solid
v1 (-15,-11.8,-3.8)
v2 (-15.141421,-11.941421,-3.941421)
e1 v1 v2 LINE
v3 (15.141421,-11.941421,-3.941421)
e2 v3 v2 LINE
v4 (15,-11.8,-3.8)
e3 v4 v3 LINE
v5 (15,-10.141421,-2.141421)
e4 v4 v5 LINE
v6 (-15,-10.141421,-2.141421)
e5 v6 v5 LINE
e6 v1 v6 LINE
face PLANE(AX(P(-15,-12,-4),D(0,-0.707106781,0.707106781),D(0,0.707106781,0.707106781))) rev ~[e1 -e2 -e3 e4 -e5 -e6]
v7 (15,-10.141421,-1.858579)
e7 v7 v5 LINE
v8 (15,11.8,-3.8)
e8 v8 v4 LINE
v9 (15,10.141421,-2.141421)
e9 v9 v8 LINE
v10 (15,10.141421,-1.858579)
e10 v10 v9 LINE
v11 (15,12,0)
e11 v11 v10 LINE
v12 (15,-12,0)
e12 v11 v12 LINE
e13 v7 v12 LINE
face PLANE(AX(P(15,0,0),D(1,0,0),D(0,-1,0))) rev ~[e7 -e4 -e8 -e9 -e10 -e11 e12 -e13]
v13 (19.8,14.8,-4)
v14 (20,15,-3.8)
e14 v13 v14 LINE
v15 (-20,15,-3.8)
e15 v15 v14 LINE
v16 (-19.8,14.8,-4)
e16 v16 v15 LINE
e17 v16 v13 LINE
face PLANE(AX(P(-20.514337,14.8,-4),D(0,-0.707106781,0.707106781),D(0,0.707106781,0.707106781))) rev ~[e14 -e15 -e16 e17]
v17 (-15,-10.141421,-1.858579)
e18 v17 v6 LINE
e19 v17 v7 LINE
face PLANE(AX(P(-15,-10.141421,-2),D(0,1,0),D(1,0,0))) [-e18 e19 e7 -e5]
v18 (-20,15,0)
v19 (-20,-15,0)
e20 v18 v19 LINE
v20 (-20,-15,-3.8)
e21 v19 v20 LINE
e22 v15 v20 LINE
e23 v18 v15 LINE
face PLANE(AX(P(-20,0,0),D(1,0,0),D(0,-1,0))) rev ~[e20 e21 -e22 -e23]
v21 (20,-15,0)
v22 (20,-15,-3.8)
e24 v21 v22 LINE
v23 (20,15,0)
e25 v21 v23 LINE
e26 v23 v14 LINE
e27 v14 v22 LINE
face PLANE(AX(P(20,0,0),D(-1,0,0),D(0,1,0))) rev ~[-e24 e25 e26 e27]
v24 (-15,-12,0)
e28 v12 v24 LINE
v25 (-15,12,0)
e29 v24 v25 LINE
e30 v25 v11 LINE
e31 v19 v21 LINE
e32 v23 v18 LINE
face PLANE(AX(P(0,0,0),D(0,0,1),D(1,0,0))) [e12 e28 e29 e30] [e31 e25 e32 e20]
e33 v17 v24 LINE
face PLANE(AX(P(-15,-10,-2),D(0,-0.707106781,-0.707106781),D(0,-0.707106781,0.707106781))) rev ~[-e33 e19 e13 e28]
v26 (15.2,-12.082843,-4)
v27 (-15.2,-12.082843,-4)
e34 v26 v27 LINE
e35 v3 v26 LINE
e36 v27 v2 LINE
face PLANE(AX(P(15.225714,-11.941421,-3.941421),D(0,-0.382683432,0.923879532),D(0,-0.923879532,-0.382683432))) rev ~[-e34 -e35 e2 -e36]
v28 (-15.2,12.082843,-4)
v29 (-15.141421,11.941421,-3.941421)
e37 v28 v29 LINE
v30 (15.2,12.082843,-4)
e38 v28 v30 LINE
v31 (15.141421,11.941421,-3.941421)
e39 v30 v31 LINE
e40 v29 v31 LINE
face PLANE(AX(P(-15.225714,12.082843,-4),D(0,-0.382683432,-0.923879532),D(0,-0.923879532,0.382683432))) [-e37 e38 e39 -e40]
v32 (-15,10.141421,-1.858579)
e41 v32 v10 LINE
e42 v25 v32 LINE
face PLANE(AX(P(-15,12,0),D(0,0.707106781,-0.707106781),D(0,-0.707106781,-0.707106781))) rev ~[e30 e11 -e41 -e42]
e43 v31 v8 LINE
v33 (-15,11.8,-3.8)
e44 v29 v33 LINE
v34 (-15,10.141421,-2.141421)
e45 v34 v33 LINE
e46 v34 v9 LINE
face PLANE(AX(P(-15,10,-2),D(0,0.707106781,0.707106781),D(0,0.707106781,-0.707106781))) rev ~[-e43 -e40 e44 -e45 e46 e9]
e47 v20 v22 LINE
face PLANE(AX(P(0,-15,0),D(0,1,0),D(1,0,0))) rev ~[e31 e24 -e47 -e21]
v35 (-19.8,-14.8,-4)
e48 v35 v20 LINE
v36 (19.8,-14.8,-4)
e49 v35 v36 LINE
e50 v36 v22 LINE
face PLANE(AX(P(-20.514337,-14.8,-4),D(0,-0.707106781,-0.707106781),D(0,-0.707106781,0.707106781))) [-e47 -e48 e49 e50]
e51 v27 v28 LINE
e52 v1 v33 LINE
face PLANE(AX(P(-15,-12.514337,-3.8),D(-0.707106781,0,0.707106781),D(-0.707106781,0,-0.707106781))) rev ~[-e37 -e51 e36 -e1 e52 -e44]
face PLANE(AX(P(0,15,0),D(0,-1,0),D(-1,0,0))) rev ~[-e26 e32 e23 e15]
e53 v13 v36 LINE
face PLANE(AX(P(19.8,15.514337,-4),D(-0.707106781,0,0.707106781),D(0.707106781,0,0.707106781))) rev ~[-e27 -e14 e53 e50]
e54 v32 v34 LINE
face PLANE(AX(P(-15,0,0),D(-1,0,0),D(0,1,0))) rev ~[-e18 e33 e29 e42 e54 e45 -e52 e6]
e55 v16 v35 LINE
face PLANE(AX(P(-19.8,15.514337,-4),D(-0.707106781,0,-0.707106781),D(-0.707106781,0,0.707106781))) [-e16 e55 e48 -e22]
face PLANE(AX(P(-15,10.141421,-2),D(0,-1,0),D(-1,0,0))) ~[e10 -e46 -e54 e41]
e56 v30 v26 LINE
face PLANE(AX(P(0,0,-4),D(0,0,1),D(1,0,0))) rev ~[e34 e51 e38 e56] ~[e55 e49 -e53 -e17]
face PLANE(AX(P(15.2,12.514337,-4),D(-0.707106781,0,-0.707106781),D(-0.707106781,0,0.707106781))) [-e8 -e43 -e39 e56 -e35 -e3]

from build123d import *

# Parameters (mm, degrees)
F0_W         = 40
F0_H         = 30
F0_W_2       = 30
F0_H_2       = 24
F4_DEPTH     = 30
F5_SIZE      = 0.2
F6_T1_DEPTH  = 31.0286731952
F6_T3_DEPTH  = 41.0286731952
F6_T5_DEPTH  = 30
F6_T10_DEPTH = 25.0286731952
F6_T16_DEPTH = 25.0286731952
F6_T23_DEPTH = 25.0286731952
F6_T27_DEPTH = 30.225714172
F6_T34_DEPTH = 25.0286731952
F6_T38_DEPTH = 30.225714172
F6_T45_DEPTH = 30.225714172
F6_T49_DEPTH = 25.0286731952
F6_T56_DEPTH = 25.0286731952
F6_T60_DEPTH = 30.225714172


# Not quite as in the source:
# - a fillet or chamfer that OpenCascade refuses, or shapes differently, is made with other operations: its cross-section is extruded or revolved along the edge and cut away or added


with BuildPart() as f2:
    # F2: sweep along a path in F1
    with BuildLine(Plane.XZ) as f2_path:
        Line((0, 0), (0, -4))
    # F0 (on Top) → F2 (sweep)
    with BuildSketch(Plane.XY):
        Rectangle(F0_W, F0_H)
        Rectangle(F0_W_2, F0_H_2, mode=Mode.SUBTRACT)
    sweep(path=f2_path.line)

    # F3 (on face) → F4 (join, through all)
    with BuildSketch(Plane.YZ.offset(-15)):
        Polygon((-10, -2), (-12, 0), (-12, -4), align=None)
        Polygon((10, -2), (12, -4), (12, 0), align=None)
    extrude(amount=F4_DEPTH)

    # F5
    f5_edges = [f2.edges().sort_by_distance(p)[0] for p in [
        (0, -10, -2),
        (0, 10, -2),
    ]]
    chamfer(f5_edges, length=F5_SIZE)

    # F6: chamfer of 0.2 on 8 edges, made by hand

    # F6_s2 → F6_t1 (cut)
    with BuildSketch(Plane.XZ.offset(-15.5143365976)):
        Polygon((19.8, -4), (20, -3.8), (20, -4), align=None)
        Polygon((-19.8, -4), (-20, -3.8), (-20, -4), align=None)
    extrude(amount=F6_T1_DEPTH, mode=Mode.SUBTRACT)

    # F6_s4 → F6_t3 (cut)
    with BuildSketch(Plane.YZ.offset(-20.5143365976)):
        Polygon((-14.8, -4), (-15, -3.8), (-15, -4), align=None)
        Polygon((14.8, -4), (15, -3.8), (15, -4), align=None)
    extrude(amount=F6_T3_DEPTH, mode=Mode.SUBTRACT)

    # F6_s6 → F6_t5 (cut)
    with BuildSketch(Plane.YZ.offset(-15)):
        Polygon((-11.9414213562, -3.9414213562), (-12.0828427125, -4), (-12, -4), align=None)
        Polygon((12.0828427125, -4), (11.9414213562, -3.9414213562), (12, -4), align=None)
    extrude(amount=F6_T5_DEPTH, mode=Mode.SUBTRACT)


with BuildPart() as f6_tool8:
    # F6_s9 → F6_t10 (new body)
    with BuildSketch(Plane.XZ.offset(12.5143365976)):
        Polygon((-15, -3.8), (-15.2, -4), (-15, -4), align=None)
    extrude(amount=-F6_T10_DEPTH)

    split(bisect_by=Plane(origin=(0, -4, 4), x_dir=(1, 0, 0), z_dir=(0, 0.7071067812, -0.7071067812)), keep=Keep.TOP)

    split(bisect_by=Plane(origin=(0, 4, 4), x_dir=(1, 0, 0), z_dir=(0, -0.7071067812, -0.7071067812)), keep=Keep.TOP)


with BuildPart() as f2_1:
    add(f2.part)

    # F6_t7: cut F6_tool8
    add(f6_tool8.part, mode=Mode.SUBTRACT)


with BuildPart() as f6_tool14:
    # F6_s15 → F6_t16 (new body)
    with BuildSketch(Plane.XZ.offset(-12.5143365976)):
        Polygon((15.2, -4), (15, -3.8), (15, -4), align=None)
    extrude(amount=F6_T16_DEPTH)

    split(bisect_by=Plane(origin=(0, -4, 4), x_dir=(1, 0, 0), z_dir=(0, 0.7071067812, -0.7071067812)), keep=Keep.TOP)

    split(bisect_by=Plane(origin=(0, 4, 4), x_dir=(1, 0, 0), z_dir=(0, -0.7071067812, -0.7071067812)), keep=Keep.TOP)


with BuildPart() as f2_2:
    add(f2_1.part)

    # F6_t13: cut F6_tool14
    add(f6_tool14.part, mode=Mode.SUBTRACT)


with BuildPart() as f6_tool21:
    # F6_s22 → F6_t23 (new body)
    with BuildSketch(Plane.XZ.offset(12.5143365976)):
        Polygon((-15, -3.8), (-15.2, -4), (-15, -4), align=None)
    extrude(amount=-F6_T23_DEPTH)

    split(bisect_by=Plane(origin=(0, -4, 4), x_dir=(1, 0, 0), z_dir=(0, -0.7071067812, 0.7071067812)), keep=Keep.TOP)


with BuildPart() as f6_tool25:
    # F6_s26 → F6_t27 (new body)
    with BuildSketch(Plane.YZ.offset(15)):
        Polygon((-11.9414213562, -3.9414213562), (-12.0828427125, -4), (-12, -4), align=None)
    extrude(amount=-F6_T27_DEPTH)

    split(bisect_by=Plane.YZ.offset(-15), keep=Keep.BOTTOM)


with BuildPart() as f6_tool21_1:
    add(f6_tool21.part)

    # F6_t29: intersect F6_tool25
    add(f6_tool25.part, mode=Mode.INTERSECT)


with BuildPart() as f2_3:
    add(f2_2.part)

    # F6_t19: cut F6_tool21
    add(f6_tool21_1.part, mode=Mode.SUBTRACT)


with BuildPart() as f6_tool32:
    # F6_s33 → F6_t34 (new body)
    with BuildSketch(Plane.XZ.offset(12.5143365976)):
        Polygon((-15, -3.8), (-15.2, -4), (-15, -4), align=None)
    extrude(amount=-F6_T34_DEPTH)

    split(bisect_by=Plane(origin=(0, 4, 4), x_dir=(1, 0, 0), z_dir=(0, 0.7071067812, 0.7071067812)), keep=Keep.TOP)


with BuildPart() as f6_tool36:
    # F6_s37 → F6_t38 (new body)
    with BuildSketch(Plane.YZ.offset(-15.225714172)):
        Polygon((12.0828427125, -4), (11.9414213562, -3.9414213562), (12, -4), align=None)
    extrude(amount=F6_T38_DEPTH)

    split(bisect_by=Plane.YZ.offset(-15), keep=Keep.BOTTOM)


with BuildPart() as f6_tool32_1:
    add(f6_tool32.part)

    # F6_t40: intersect F6_tool36
    add(f6_tool36.part, mode=Mode.INTERSECT)


with BuildPart() as f2_4:
    add(f2_3.part)

    # F6_t30: cut F6_tool32
    add(f6_tool32_1.part, mode=Mode.SUBTRACT)


with BuildPart() as f6_tool43:
    # F6_s44 → F6_t45 (new body)
    with BuildSketch(Plane.YZ.offset(15.225714172)):
        Polygon((-11.9414213562, -3.9414213562), (-12.0828427125, -4), (-12, -4), align=None)
    extrude(amount=-F6_T45_DEPTH)

    split(bisect_by=Plane.YZ.offset(15), keep=Keep.TOP)


with BuildPart() as f6_tool47:
    # F6_s48 → F6_t49 (new body)
    with BuildSketch(Plane.XZ.offset(-12.5143365976)):
        Polygon((15.2, -4), (15, -3.8), (15, -4), align=None)
    extrude(amount=F6_T49_DEPTH)

    split(bisect_by=Plane(origin=(0, -4, 4), x_dir=(1, 0, 0), z_dir=(0, -0.7071067812, 0.7071067812)), keep=Keep.TOP)


with BuildPart() as f6_tool43_1:
    add(f6_tool43.part)

    # F6_t51: intersect F6_tool47
    add(f6_tool47.part, mode=Mode.INTERSECT)


with BuildPart() as f2_5:
    add(f2_4.part)

    # F6_t41: cut F6_tool43
    add(f6_tool43_1.part, mode=Mode.SUBTRACT)


with BuildPart() as f6_tool54:
    # F6_s55 → F6_t56 (new body)
    with BuildSketch(Plane.XZ.offset(-12.5143365976)):
        Polygon((15.2, -4), (15, -3.8), (15, -4), align=None)
    extrude(amount=F6_T56_DEPTH)

    split(bisect_by=Plane(origin=(0, 4, 4), x_dir=(1, 0, 0), z_dir=(0, 0.7071067812, 0.7071067812)), keep=Keep.TOP)


with BuildPart() as f6_tool58:
    # F6_s59 → F6_t60 (new body)
    with BuildSketch(Plane.YZ.offset(-15)):
        Polygon((12.0828427125, -4), (11.9414213562, -3.9414213562), (12, -4), align=None)
    extrude(amount=F6_T60_DEPTH)

    split(bisect_by=Plane.YZ.offset(15), keep=Keep.TOP)


with BuildPart() as f6_tool54_1:
    add(f6_tool54.part)

    # F6_t62: intersect F6_tool58
    add(f6_tool58.part, mode=Mode.INTERSECT)


with BuildPart() as f2_6:
    add(f2_5.part)

    # F6_t52: cut F6_tool54
    add(f6_tool54_1.part, mode=Mode.SUBTRACT)


solid = f2_6.part
